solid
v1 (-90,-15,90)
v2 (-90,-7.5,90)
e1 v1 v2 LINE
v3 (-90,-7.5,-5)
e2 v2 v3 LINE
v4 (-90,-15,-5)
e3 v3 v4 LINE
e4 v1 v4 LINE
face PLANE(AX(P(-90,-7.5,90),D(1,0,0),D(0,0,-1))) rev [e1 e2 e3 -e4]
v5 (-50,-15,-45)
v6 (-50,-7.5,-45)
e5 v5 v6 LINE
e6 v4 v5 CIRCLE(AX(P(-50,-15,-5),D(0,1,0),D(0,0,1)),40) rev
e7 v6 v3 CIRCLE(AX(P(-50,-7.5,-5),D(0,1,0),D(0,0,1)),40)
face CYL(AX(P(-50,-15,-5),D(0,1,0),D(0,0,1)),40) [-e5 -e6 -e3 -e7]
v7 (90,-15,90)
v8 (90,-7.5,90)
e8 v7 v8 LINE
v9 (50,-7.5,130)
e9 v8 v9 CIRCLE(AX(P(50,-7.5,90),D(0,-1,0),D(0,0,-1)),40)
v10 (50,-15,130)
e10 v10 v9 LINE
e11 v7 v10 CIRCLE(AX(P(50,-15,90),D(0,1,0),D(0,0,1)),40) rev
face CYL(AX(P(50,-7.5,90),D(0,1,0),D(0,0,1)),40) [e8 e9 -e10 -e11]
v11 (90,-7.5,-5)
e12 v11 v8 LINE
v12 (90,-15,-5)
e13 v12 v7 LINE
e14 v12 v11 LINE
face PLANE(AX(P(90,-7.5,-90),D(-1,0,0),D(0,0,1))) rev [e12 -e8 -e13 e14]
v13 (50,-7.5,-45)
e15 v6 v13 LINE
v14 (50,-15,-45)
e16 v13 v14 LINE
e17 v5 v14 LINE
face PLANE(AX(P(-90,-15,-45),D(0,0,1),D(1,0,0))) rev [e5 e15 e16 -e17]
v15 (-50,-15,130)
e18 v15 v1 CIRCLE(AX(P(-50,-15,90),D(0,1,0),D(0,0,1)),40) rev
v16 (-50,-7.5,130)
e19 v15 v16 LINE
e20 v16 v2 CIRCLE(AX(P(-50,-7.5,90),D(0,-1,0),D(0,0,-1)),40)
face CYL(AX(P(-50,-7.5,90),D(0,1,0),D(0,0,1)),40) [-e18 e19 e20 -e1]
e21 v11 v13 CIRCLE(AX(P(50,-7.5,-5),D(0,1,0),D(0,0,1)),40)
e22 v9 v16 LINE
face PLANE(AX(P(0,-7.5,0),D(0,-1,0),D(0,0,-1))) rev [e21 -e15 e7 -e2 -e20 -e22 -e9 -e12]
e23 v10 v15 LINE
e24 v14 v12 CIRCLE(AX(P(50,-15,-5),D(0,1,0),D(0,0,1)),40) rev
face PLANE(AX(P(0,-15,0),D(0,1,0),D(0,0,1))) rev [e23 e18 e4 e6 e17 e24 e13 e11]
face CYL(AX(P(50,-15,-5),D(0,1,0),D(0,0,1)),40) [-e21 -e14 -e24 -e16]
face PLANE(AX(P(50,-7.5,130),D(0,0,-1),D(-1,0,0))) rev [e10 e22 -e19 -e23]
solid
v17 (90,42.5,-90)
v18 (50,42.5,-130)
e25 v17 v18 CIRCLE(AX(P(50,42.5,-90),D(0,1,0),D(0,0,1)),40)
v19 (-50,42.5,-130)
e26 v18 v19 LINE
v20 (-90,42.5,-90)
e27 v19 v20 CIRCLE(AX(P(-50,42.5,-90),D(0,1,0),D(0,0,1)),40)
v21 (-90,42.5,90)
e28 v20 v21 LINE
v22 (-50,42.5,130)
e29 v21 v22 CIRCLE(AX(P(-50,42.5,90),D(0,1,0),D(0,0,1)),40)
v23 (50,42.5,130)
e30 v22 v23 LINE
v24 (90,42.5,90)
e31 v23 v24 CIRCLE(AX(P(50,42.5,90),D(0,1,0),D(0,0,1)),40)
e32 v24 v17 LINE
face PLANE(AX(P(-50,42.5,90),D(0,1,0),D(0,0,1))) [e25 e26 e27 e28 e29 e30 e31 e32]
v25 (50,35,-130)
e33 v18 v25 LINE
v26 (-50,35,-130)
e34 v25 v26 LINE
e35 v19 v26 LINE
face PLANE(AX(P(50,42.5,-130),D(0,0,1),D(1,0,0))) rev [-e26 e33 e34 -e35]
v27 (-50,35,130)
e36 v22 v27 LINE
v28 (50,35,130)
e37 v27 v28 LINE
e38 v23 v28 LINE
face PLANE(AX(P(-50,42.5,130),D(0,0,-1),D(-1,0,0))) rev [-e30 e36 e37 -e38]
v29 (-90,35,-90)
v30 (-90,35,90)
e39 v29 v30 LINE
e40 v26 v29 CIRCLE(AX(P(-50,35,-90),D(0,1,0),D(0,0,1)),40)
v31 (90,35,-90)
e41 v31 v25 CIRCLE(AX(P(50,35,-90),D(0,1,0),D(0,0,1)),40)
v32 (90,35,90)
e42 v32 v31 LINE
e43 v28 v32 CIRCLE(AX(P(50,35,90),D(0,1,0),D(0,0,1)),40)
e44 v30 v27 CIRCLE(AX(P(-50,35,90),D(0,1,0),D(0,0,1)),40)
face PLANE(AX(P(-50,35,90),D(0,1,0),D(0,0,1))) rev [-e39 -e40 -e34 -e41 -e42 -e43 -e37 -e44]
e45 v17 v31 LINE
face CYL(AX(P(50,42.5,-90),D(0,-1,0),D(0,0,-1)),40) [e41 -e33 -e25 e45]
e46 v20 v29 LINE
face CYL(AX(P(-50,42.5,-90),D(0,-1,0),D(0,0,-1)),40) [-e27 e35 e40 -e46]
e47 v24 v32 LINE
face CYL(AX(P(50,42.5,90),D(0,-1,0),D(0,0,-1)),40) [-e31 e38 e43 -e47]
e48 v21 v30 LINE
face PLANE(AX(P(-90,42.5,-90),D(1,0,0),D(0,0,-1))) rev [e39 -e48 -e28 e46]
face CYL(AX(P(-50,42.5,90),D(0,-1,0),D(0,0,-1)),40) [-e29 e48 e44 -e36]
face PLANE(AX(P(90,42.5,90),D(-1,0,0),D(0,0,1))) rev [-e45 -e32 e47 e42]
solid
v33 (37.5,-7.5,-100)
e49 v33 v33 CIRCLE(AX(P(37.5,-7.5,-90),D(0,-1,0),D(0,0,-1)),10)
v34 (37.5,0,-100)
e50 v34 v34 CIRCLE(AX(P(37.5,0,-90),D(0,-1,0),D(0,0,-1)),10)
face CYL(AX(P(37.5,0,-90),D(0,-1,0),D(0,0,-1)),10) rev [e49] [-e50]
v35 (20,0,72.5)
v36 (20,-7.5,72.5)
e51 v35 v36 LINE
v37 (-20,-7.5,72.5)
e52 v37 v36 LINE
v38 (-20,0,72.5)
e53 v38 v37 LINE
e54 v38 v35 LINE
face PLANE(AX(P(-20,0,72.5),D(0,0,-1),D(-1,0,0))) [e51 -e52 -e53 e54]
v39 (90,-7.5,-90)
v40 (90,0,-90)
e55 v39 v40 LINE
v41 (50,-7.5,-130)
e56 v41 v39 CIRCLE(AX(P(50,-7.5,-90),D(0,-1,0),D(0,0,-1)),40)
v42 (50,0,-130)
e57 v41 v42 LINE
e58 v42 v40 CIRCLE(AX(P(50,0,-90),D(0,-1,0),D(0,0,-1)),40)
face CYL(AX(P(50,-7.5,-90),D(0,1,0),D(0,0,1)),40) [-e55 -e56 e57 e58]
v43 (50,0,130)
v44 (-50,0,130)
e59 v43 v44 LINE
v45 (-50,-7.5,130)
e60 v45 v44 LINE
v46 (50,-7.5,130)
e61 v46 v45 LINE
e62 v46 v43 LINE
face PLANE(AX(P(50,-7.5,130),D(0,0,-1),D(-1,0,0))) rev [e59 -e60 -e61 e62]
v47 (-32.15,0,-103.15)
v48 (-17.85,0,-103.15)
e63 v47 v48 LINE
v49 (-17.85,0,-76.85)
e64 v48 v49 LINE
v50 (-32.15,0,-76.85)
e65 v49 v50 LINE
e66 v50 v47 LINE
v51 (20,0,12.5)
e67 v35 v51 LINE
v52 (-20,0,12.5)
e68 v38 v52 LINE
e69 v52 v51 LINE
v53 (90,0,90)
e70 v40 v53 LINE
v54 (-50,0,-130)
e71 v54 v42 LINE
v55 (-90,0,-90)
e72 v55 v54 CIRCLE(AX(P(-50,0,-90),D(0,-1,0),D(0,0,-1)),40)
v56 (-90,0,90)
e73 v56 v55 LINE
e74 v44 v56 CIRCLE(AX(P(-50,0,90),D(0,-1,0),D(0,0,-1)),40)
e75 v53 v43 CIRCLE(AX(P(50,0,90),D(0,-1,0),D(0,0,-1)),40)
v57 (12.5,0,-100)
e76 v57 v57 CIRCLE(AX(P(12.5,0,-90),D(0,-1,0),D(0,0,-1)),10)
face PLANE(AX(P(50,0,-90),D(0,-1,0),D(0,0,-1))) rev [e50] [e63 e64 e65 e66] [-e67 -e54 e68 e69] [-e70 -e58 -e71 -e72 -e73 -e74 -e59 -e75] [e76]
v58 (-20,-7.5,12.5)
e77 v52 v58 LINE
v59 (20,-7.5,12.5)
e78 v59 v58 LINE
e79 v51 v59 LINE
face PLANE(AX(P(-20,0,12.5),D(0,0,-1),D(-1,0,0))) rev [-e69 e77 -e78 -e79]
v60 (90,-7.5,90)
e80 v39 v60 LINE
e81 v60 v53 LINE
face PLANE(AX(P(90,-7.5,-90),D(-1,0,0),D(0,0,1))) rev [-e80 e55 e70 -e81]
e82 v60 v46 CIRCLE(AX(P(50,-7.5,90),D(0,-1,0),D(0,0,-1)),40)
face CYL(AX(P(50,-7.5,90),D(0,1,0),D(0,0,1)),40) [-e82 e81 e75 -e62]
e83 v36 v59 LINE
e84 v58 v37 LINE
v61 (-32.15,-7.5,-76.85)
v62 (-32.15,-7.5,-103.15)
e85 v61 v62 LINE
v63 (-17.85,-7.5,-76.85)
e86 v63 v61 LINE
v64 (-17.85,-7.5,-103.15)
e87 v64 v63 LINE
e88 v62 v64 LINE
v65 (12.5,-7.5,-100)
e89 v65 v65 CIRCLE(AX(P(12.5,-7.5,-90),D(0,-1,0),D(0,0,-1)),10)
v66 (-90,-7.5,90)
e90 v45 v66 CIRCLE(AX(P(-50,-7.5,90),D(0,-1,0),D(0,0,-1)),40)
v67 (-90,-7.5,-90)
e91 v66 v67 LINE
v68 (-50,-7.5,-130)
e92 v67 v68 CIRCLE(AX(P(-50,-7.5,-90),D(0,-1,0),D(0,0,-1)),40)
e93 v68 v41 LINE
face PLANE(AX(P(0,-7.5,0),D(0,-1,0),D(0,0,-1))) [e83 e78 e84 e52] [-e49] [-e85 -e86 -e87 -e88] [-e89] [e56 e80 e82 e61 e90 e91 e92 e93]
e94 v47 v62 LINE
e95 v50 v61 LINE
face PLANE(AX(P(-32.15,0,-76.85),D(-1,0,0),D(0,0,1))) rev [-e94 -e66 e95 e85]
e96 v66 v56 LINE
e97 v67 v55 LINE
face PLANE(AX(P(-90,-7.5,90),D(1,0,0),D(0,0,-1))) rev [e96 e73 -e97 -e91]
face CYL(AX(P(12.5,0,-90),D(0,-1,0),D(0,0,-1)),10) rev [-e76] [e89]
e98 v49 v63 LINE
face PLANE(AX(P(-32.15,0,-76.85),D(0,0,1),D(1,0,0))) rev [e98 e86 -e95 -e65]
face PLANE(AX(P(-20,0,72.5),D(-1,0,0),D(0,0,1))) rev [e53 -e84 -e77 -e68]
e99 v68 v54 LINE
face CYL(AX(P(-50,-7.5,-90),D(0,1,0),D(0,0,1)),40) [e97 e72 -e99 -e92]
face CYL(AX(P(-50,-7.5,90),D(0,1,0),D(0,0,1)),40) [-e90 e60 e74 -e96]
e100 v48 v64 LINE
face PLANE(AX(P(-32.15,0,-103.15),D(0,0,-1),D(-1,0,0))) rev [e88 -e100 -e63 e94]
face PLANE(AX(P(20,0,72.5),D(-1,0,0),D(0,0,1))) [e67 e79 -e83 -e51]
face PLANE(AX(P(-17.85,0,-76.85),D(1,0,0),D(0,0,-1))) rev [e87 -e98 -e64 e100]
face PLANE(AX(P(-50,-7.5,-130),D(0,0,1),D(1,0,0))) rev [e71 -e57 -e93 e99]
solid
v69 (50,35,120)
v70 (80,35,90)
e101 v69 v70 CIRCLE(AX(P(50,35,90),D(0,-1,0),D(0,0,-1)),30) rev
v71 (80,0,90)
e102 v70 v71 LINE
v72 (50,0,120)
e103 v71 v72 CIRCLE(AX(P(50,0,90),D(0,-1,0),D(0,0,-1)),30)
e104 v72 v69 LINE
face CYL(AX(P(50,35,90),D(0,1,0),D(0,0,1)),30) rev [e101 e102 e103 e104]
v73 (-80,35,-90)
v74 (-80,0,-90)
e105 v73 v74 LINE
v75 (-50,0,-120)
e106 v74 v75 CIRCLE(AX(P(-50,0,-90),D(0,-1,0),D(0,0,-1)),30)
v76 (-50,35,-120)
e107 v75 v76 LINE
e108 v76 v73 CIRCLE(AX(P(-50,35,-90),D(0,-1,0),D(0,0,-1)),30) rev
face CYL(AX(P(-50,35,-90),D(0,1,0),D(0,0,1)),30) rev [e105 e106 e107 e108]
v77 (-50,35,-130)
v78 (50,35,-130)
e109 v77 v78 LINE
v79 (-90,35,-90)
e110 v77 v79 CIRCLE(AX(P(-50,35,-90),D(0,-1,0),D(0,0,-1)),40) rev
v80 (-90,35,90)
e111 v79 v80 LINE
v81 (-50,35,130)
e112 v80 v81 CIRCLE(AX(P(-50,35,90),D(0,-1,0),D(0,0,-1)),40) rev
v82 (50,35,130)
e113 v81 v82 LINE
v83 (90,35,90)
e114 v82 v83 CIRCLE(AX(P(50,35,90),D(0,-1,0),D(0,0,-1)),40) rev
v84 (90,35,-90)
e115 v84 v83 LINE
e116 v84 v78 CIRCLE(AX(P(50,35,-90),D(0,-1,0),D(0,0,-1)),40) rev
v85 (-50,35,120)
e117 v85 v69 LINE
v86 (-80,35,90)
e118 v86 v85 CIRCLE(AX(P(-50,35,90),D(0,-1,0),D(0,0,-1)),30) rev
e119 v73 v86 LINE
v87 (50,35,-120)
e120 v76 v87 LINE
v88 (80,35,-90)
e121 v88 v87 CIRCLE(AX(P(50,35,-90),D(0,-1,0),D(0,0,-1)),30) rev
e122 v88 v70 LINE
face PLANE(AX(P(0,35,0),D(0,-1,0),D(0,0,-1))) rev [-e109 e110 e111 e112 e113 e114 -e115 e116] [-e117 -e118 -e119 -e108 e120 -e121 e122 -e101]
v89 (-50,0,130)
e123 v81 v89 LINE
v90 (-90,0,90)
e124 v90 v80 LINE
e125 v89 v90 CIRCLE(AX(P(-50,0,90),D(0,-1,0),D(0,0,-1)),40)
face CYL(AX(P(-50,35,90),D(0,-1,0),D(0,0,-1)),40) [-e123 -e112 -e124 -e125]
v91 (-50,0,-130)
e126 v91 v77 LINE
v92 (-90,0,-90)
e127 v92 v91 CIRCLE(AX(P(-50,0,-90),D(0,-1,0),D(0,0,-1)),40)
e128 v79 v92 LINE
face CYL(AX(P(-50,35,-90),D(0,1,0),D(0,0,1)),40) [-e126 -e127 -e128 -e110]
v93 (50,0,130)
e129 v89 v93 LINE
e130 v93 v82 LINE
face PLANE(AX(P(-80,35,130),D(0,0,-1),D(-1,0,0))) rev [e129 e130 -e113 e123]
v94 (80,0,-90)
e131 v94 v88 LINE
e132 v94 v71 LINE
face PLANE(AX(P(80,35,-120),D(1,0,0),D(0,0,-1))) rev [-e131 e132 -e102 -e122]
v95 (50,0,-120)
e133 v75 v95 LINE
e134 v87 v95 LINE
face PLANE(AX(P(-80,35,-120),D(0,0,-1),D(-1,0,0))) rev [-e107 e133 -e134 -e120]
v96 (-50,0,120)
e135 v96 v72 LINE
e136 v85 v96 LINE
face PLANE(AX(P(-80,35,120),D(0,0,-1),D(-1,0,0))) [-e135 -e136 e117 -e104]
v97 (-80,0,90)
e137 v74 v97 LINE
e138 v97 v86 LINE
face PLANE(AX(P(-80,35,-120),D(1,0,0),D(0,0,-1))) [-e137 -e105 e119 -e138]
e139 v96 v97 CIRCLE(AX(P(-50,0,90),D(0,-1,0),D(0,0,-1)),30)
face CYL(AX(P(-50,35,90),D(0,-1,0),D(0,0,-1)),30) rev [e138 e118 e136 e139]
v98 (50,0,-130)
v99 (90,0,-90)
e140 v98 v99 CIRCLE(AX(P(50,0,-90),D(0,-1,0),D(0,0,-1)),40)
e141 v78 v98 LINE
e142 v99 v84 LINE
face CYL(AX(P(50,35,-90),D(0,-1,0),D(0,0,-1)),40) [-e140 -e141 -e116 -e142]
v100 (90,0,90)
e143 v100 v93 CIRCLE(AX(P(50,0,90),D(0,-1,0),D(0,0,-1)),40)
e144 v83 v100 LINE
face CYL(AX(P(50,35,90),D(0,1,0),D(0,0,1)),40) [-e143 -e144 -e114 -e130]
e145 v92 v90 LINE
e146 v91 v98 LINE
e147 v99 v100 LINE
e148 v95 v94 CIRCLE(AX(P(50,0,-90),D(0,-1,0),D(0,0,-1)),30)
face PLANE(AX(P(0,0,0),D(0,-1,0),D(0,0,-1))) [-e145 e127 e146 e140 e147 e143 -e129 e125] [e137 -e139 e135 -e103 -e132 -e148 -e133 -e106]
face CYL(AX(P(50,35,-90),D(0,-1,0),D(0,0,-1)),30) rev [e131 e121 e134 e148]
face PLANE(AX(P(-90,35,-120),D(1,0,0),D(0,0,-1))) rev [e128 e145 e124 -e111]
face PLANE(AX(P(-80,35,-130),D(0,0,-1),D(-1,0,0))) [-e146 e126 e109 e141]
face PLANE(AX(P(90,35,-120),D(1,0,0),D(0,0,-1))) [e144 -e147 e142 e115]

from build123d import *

# Parameters (mm, degrees)
SKETCH1_W           = 160
SKETCH1_H           = 240
BOSS_EXTRUDE1_DEPTH = 35
FILLET1_R           = 30
SHELL2_T            = 10
BOSS_EXTRUDE3_DEPTH = 7.5
BOSS_EXTRUDE4_DEPTH = 7.5
SKETCH6_W           = 180
SKETCH6_H           = 175
BOSS_EXTRUDE5_DEPTH = 7.5
FILLET2_R           = 40
SKETCH9_W           = 40
SKETCH9_H           = 60
CUT_EXTRUDE1_DEPTH  = 15
SKETCH10_W          = 40
SKETCH10_H          = 60
BOSS_EXTRUDE6_DEPTH = 7.5
SKETCH11_W          = 14.3
SKETCH11_H          = 26.3
CUT_EXTRUDE2_DEPTH  = 7.5
SKETCH12_R          = 10
CUT_EXTRUDE4_DEPTH  = 7.5


# Read off the part's stored shape, not the designer's step: Split2
with BuildPart() as part:
    # Sketch1 → Boss-Extrude1 (new body)
    with BuildSketch(Plane(origin=(0, 0, 0), x_dir=(1, 0, 0), z_dir=(0, 1, 0))):
        Rectangle(SKETCH1_W, SKETCH1_H)
    extrude(amount=BOSS_EXTRUDE1_DEPTH)

    # Fillet1
    fillet1_edges = [part.edges().sort_by_distance(p)[0] for p in [
        (-80, 17.5, 120),
        (-80, 17.5, -120),
        (80, 17.5, -120),
        (80, 17.5, 120),
    ]]
    fillet(fillet1_edges, radius=FILLET1_R)

    # Shell2
    shell2_openings = [part.faces().sort_by_distance(p)[0] for p in [
        (0, 0, 0),
        (0, 35, 0),
    ]]
    offset(amount=SHELL2_T, openings=shell2_openings, kind=Kind.INTERSECTION)


with BuildPart() as body_2:
    # Sketch2 → Boss-Extrude3 (new body)
    with BuildSketch(Plane.XZ):
        with BuildLine():
            Line((90, -90), (90, 90))
            ThreePointArc((90, 90), (78.284271247, 118.284271247), (50, 130))
            Line((50, 130), (-50, 130))
            ThreePointArc((-50, 130), (-78.284271247, 118.284271247), (-90, 90))
            Line((-90, 90), (-90, -90))
            ThreePointArc((-90, -90), (-78.284271247, -118.284271247), (-50, -130))
            Line((-50, -130), (50, -130))
            ThreePointArc((50, -130), (78.284271247, -118.284271247), (90, -90))
        make_face()
    extrude(amount=BOSS_EXTRUDE3_DEPTH)


with BuildPart() as body_3:
    # Sketch3 → Boss-Extrude4 (new body)
    with BuildSketch(Plane(origin=(0, 35, 0), x_dir=(1, 0, 0), z_dir=(0, 1, 0))):
        with BuildLine():
            Line((-50, -130), (50, -130))
            ThreePointArc((50, -130), (78.284271247, -118.284271247), (90, -90))
            Line((90, -90), (90, 90))
            ThreePointArc((90, 90), (78.284271247, 118.284271247), (50, 130))
            Line((50, 130), (-50, 130))
            ThreePointArc((-50, 130), (-78.284271247, 118.284271247), (-90, 90))
            Line((-90, 90), (-90, -90))
            ThreePointArc((-90, -90), (-78.284271247, -118.284271247), (-50, -130))
        make_face()
    extrude(amount=BOSS_EXTRUDE4_DEPTH)


with BuildPart() as body_4:
    # Sketch6 → Boss-Extrude5 (new body)
    with BuildSketch(Plane.XZ.offset(7.5)):
        with Locations((0, 42.5)):
            Rectangle(SKETCH6_W, SKETCH6_H)
    extrude(amount=BOSS_EXTRUDE5_DEPTH)

    # Fillet2
    fillet2_edges = [body_4.edges().sort_by_distance(p)[0] for p in [
        (-90, -11.25, 130),
        (90, -11.25, 130),
        (90, -11.25, -45),
        (-90, -11.25, -45),
    ]]
    fillet(fillet2_edges, radius=FILLET2_R)


with BuildPart() as cut_extrude1_tool:
    # Sketch9 → Cut-Extrude1 (new body)
    with BuildSketch(Plane.XZ.offset(15)):
        with Locations((0, 42.5)):
            Rectangle(SKETCH9_W, SKETCH9_H)
    extrude(amount=-CUT_EXTRUDE1_DEPTH)


with BuildPart() as body_2_1:
    add(body_2.part)

    # Cut-Extrude1: cut by cut_extrude1_tool
    add(cut_extrude1_tool.part, mode=Mode.SUBTRACT)



with BuildPart() as body_4_1:
    add(body_4.part)

    # Cut-Extrude1: cut by cut_extrude1_tool
    add(cut_extrude1_tool.part, mode=Mode.SUBTRACT)


with BuildPart() as body_2_2:
    add(body_2_1.part)

    add(body_4_1.part)  # Boss-Extrude6 merges body 4
    # Sketch10 → Boss-Extrude6 (add)
    with BuildSketch(Plane(origin=(0, -7.5, 0), x_dir=(1, 0, 0), z_dir=(0, 1, 0))):
        with Locations((0, -42.5)):
            Rectangle(SKETCH10_W, SKETCH10_H)
    extrude(amount=-BOSS_EXTRUDE6_DEPTH)

    # Sketch11 → Cut-Extrude2 (cut)
    with BuildSketch(Plane.XZ.offset(7.5)):
        with Locations((-25, -90)):
            Rectangle(SKETCH11_W, SKETCH11_H)
    extrude(amount=-CUT_EXTRUDE2_DEPTH, mode=Mode.SUBTRACT)

    # Sketch12 → Cut-Extrude4 (cut)
    with BuildSketch(Plane.XZ.offset(7.5)):
        with Locations(Location((12.5, -90, 0), (0, 0, 270))):
            Circle(SKETCH12_R)
        with Locations(Location((37.5, -90, 0), (0, 0, 270))):
            Circle(SKETCH12_R)
    extrude(amount=-CUT_EXTRUDE4_DEPTH, mode=Mode.SUBTRACT)


with BuildPart() as body_4_2:
    # Split2: the piece on the far side of the plane
    add(body_2_2.part)
    split(bisect_by=Plane(origin=(0, -7.5, 0), x_dir=(1, 0, 0), z_dir=(0, 1, 0)), keep=Keep.BOTTOM)


with BuildPart() as body_2_3:
    add(body_2_2.part)

    # Split2
    split(bisect_by=Plane(origin=(0, -7.5, 0), x_dir=(1, 0, 0), z_dir=(0, 1, 0)), keep=Keep.TOP)


solid = Compound([part.part, body_3.part, body_4_2.part, body_2_3.part])
